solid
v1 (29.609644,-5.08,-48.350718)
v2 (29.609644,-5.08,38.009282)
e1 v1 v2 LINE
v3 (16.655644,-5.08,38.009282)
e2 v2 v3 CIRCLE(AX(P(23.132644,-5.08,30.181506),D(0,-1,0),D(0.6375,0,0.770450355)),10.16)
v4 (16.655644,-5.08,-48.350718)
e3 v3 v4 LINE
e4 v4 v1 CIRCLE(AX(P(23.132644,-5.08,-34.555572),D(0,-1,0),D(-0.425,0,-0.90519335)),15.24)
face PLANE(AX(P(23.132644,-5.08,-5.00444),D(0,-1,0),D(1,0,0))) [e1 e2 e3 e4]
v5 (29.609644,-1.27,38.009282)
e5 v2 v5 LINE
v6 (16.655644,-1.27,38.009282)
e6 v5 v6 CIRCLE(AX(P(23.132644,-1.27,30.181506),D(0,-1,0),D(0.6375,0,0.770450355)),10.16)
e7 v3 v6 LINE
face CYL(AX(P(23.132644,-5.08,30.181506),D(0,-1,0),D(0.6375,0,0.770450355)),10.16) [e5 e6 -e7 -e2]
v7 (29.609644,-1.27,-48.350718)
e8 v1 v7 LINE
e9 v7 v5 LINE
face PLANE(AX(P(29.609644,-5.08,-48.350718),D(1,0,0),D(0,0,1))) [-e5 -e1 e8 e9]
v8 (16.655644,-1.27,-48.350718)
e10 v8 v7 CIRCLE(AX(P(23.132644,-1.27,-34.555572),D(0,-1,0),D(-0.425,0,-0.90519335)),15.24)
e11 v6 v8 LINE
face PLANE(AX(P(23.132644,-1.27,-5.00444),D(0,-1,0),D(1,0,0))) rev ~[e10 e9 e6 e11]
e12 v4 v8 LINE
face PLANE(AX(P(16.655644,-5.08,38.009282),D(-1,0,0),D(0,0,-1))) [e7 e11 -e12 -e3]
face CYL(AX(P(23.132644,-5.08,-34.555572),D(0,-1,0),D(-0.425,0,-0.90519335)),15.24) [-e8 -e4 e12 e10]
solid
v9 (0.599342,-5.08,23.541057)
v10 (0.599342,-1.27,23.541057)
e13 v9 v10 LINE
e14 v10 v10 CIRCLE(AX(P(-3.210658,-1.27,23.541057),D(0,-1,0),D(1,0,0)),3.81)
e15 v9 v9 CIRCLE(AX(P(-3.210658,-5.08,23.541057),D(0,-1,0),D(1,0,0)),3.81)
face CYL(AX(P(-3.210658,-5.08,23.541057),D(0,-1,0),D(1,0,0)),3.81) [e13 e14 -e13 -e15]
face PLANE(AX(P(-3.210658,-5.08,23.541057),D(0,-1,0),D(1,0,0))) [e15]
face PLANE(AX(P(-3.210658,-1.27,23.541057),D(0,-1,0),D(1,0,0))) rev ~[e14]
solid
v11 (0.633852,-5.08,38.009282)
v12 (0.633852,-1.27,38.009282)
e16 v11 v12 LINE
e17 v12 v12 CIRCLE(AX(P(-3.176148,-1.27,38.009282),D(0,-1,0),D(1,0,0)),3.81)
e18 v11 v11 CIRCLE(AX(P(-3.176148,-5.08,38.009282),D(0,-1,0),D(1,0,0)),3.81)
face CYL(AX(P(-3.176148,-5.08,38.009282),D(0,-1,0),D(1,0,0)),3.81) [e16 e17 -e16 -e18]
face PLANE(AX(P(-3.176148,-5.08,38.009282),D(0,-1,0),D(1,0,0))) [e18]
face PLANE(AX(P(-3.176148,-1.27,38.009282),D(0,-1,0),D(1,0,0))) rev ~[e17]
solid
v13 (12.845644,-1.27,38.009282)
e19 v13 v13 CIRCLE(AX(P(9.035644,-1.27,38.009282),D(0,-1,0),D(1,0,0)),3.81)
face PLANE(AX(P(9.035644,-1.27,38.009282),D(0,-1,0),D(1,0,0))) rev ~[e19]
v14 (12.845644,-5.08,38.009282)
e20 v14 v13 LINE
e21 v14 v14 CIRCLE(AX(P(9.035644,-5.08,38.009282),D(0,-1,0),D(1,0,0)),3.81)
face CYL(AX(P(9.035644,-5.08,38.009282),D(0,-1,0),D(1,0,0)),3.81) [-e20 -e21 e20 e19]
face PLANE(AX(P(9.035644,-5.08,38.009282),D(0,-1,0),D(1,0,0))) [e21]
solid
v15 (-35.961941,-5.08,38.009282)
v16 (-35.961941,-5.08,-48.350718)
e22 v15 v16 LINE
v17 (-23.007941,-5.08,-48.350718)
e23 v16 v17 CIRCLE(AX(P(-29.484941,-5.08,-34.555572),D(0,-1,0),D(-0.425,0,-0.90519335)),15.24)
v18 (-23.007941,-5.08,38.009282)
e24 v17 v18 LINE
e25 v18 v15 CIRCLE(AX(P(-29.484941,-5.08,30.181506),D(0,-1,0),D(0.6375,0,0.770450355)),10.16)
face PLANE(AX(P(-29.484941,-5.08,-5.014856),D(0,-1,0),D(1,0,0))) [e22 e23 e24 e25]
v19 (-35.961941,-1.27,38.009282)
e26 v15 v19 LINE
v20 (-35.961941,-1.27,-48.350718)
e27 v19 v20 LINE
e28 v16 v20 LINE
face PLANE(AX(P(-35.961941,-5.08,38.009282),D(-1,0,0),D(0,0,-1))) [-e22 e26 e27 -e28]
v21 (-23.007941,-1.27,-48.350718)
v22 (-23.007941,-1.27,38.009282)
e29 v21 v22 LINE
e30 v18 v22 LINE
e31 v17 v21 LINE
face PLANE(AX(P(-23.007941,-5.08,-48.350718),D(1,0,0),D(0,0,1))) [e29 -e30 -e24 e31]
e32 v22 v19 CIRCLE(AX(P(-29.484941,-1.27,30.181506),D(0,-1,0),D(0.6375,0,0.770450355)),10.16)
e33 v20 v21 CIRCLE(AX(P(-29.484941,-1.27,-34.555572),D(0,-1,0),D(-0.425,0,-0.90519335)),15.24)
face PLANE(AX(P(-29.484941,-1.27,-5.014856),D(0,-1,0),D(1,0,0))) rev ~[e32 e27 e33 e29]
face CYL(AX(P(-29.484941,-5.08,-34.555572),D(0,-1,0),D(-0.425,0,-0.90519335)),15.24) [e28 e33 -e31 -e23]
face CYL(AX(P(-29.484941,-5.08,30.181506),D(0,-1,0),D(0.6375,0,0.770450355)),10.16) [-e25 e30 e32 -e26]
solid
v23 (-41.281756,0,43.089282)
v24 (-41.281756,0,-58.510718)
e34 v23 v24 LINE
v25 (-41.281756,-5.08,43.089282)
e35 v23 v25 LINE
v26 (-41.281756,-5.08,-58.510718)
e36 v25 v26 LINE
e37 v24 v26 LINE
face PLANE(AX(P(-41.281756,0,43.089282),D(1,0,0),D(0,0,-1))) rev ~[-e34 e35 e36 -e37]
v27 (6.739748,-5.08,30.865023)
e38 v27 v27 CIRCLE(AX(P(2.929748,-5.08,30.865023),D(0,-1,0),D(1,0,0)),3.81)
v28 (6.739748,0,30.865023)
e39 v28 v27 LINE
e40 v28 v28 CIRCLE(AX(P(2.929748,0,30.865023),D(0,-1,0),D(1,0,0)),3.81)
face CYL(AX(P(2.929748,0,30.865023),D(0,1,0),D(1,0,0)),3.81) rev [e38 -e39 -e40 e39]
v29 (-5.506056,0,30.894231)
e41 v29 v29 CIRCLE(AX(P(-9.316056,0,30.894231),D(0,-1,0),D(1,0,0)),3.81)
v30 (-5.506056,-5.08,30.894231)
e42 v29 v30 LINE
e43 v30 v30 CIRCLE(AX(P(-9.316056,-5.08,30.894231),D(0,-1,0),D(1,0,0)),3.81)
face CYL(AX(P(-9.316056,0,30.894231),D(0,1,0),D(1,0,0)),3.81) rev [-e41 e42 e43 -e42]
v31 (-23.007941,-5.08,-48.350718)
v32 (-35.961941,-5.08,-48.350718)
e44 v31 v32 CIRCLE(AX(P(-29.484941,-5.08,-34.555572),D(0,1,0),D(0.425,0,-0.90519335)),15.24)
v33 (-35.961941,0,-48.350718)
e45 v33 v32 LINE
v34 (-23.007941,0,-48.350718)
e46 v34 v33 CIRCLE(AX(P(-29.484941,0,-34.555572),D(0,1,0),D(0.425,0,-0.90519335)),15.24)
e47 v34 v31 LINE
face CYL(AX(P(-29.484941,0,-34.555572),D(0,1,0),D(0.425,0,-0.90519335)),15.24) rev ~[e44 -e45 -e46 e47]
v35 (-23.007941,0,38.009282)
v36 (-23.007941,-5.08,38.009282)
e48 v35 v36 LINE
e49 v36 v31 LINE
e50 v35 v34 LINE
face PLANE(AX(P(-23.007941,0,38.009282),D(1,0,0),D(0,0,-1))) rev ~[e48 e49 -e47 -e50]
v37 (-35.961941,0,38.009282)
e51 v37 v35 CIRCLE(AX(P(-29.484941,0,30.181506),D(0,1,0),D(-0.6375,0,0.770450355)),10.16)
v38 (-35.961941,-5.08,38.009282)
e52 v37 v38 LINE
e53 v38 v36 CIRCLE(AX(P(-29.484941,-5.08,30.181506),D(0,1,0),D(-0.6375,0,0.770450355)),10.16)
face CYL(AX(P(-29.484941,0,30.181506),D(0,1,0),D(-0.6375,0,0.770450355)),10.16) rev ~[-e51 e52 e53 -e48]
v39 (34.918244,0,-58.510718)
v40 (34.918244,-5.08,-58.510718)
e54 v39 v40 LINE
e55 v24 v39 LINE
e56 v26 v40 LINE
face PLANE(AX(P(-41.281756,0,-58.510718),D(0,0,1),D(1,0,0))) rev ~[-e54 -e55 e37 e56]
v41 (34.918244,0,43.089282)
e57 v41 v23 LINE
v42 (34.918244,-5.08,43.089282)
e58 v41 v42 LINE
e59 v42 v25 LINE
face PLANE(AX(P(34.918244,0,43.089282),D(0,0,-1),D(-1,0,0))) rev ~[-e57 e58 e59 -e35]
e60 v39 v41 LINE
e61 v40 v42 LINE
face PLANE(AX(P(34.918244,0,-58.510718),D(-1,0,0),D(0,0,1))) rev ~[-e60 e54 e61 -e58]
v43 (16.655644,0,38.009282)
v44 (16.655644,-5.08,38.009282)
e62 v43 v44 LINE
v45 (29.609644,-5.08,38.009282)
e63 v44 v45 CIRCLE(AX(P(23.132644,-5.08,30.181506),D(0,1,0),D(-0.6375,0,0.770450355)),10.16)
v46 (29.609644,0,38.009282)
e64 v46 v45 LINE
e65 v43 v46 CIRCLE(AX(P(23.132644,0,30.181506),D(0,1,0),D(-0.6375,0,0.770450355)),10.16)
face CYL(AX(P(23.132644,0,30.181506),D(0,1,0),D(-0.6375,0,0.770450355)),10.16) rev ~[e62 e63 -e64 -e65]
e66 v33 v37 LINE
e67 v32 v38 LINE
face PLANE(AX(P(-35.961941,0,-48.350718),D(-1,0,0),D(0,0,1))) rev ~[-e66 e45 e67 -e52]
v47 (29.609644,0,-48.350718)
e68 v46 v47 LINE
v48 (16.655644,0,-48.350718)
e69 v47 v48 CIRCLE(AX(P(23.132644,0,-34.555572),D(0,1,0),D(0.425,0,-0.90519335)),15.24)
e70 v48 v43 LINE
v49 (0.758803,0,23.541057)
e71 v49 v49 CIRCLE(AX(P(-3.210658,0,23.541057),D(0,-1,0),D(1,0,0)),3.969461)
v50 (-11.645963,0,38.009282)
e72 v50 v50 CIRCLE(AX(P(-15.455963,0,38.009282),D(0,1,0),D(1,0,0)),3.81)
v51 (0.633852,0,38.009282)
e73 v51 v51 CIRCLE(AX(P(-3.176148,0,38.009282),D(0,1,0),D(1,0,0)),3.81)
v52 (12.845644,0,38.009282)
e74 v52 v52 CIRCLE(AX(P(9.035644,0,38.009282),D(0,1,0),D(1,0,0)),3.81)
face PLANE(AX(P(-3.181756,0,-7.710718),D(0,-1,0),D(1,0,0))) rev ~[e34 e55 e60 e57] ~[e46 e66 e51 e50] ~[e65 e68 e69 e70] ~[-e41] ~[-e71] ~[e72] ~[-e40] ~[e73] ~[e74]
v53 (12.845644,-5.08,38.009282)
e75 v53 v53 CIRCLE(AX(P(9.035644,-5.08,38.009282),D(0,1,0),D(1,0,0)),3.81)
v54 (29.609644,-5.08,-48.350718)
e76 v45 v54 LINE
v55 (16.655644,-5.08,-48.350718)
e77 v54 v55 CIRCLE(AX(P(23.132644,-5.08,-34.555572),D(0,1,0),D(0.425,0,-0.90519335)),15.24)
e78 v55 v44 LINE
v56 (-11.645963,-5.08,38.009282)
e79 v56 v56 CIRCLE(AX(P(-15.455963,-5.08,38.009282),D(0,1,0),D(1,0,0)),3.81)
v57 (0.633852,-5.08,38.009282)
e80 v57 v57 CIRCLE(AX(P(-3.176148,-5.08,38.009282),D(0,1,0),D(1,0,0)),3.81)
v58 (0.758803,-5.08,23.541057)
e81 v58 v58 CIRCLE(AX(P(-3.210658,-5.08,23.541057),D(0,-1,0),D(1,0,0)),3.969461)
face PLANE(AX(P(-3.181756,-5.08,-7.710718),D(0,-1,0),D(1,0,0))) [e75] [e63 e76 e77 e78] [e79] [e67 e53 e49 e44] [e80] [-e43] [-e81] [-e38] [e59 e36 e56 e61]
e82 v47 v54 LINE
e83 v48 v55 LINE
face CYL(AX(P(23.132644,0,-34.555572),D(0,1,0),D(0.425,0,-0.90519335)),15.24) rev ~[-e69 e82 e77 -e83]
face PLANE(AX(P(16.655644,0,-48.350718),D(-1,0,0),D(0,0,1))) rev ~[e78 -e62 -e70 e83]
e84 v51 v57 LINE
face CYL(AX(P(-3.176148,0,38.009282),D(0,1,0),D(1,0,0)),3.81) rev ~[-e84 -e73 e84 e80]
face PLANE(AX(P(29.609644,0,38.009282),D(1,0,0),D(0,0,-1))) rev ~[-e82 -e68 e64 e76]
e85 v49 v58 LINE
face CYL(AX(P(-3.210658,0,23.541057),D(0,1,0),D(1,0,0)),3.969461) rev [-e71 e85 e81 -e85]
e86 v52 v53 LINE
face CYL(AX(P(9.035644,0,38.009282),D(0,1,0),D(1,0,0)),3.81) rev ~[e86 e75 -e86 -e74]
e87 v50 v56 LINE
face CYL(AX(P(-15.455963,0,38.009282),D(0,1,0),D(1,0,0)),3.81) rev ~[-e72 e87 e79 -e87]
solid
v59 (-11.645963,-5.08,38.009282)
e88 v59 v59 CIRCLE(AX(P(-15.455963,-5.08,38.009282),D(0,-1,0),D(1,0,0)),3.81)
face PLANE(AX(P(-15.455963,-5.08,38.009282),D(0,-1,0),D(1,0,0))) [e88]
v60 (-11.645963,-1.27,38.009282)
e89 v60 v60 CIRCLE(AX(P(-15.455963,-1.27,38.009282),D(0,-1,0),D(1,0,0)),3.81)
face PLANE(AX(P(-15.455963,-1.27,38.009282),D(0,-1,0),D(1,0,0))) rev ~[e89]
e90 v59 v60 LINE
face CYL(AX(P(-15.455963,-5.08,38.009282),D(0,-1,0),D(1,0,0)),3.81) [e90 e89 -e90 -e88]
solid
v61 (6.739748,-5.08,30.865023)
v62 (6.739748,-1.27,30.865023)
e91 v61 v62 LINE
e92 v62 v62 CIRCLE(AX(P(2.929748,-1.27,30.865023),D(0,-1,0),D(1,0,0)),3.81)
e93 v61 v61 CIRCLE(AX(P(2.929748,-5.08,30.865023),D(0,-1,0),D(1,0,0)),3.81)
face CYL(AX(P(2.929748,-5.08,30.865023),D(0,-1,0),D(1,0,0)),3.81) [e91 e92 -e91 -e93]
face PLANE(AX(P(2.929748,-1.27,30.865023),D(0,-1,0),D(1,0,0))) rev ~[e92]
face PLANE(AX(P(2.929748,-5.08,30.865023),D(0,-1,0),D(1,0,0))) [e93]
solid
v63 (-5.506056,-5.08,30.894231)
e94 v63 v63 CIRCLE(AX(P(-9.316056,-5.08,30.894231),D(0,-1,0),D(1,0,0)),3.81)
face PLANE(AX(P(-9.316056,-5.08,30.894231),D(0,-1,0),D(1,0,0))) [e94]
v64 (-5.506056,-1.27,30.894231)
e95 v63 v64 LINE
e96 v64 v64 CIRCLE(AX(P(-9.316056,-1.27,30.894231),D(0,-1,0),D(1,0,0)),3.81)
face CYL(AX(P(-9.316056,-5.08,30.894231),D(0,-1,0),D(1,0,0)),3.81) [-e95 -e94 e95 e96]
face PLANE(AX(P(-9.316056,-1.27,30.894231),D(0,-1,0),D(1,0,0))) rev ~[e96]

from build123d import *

# Parameters (mm, degrees)
F0_R     = 3.969461057
F0_R_2   = 3.81
F2_DEPTH = 5.08
F3_R     = 3.81
F4_DEPTH = 3.81


# Not quite as in the source:
# - the program builds the solid bodies; features that only make, move or delete a surface that nothing else refers to are left out


with BuildPart() as f2:
    # F0 (on Front) → F2 (new body)
    with BuildSketch(Plane.XZ):
        Polygon((34.9182439864, 43.0892817676), (-41.2817560136, 43.0892817676), (-41.2817560136, -58.5107182324), (34.9182439864, -58.5107182324), (34.9182439864, 38.0092817676), align=None)
        with BuildLine():
            ThreePointArc((-35.9619408846, 38.0092817676), (-29.4849408846, 40.3415061576), (-23.0079408846, 38.0092817676))
            Line((-23.0079408846, 38.0092817676), (-23.0079408846, -48.3507182324))
            ThreePointArc((-23.0079408846, -48.3507182324), (-29.4849408846, -49.7955715858), (-35.9619408846, -48.3507182324))
            Line((-35.9619408846, -48.3507182324), (-35.9619408846, 38.0092817676))
        make_face(mode=Mode.SUBTRACT)
        with Locations((-3.2106578548, 23.5410566752)):
            Circle(F0_R, mode=Mode.SUBTRACT)
        with BuildLine():
            ThreePointArc((-19.2659630901, 38.0092817676), (-15.4559630901, 41.8192817676), (-11.6459630901, 38.0092817676))
            ThreePointArc((-11.6459630901, 38.0092817676), (-15.4559630901, 34.1992817676), (-19.2659630901, 38.0092817676))
        make_face(mode=Mode.SUBTRACT)
        with Locations((-9.3160557696, 30.8942313745)):
            Circle(F0_R_2, mode=Mode.SUBTRACT)
        with BuildLine():
            ThreePointArc((16.6556439864, 38.0092817676), (23.1326439864, 40.3415061576), (29.6096439864, 38.0092817676))
            Line((29.6096439864, 38.0092817676), (29.6096439864, -48.3507182324))
            ThreePointArc((29.6096439864, -48.3507182324), (23.1326439864, -49.7955715858), (16.6556439864, -48.3507182324))
            Line((16.6556439864, -48.3507182324), (16.6556439864, 38.0092817676))
        make_face(mode=Mode.SUBTRACT)
        with Locations((2.9297477686, 30.8650228573)):
            Circle(F0_R_2, mode=Mode.SUBTRACT)
        with BuildLine():
            ThreePointArc((-6.9861484491, 38.0092817676), (-3.1761484491, 41.8192817676), (0.6338515509, 38.0092817676))
            ThreePointArc((0.6338515509, 38.0092817676), (-3.1761484491, 34.1992817676), (-6.9861484491, 38.0092817676))
        make_face(mode=Mode.SUBTRACT)
        with BuildLine():
            ThreePointArc((5.2256439864, 38.0092817676), (9.0356439864, 41.8192817676), (12.8456439864, 38.0092817676))
            ThreePointArc((12.8456439864, 38.0092817676), (9.0356439864, 34.1992817676), (5.2256439864, 38.0092817676))
        make_face(mode=Mode.SUBTRACT)
    extrude(amount=F2_DEPTH)


with BuildPart() as f4:
    # F3 (on face) → F4 (new body)
    with BuildSketch(Plane.XZ.offset(5.08)):
        with Locations((-15.4559630901, 38.0092817676)):
            Circle(F3_R)
    extrude(amount=-F4_DEPTH)


with BuildPart() as f4b:
    # F3 (on face) → F4, piece 2 (new body)
    with BuildSketch(Plane.XZ.offset(5.08)):
        with Locations((-3.1761484491, 38.0092817676)):
            Circle(F3_R)
    extrude(amount=-F4_DEPTH)


with BuildPart() as f4c:
    # F3 (on face) → F4, piece 3 (new body)
    with BuildSketch(Plane.XZ.offset(5.08)):
        with Locations((9.0356439864, 38.0092817676)):
            Circle(F3_R)
    extrude(amount=-F4_DEPTH)


with BuildPart() as f4d:
    # F3 (on face) → F4, piece 4 (new body)
    with BuildSketch(Plane.XZ.offset(5.08)):
        with Locations((2.9297477686, 30.8650228573)):
            Circle(F3_R)
    extrude(amount=-F4_DEPTH)


with BuildPart() as f4e:
    # F3 (on face) → F4, piece 5 (new body)
    with BuildSketch(Plane.XZ.offset(5.08)):
        with Locations((-9.3160557696, 30.8942313745)):
            Circle(F3_R)
    extrude(amount=-F4_DEPTH)


with BuildPart() as f4f:
    # F3 (on face) → F4, piece 6 (new body)
    with BuildSketch(Plane.XZ.offset(5.08)):
        with Locations((-3.2106578548, 23.5410566752)):
            Circle(F3_R)
    extrude(amount=-F4_DEPTH)


with BuildPart() as f4g:
    # F3 (on face) → F4, piece 7 (new body)
    with BuildSketch(Plane.XZ.offset(5.08)):
        with BuildLine():
            Line((-23.0079408846, -48.3507182324), (-23.0079408846, 38.0092817676))
            ThreePointArc((-23.0079408846, 38.0092817676), (-29.4849408846, 40.2938211878), (-35.9619408846, 38.0092817676))
            Line((-35.9619408846, 38.0092817676), (-35.9619408846, -48.3507182324))
            ThreePointArc((-35.9619408846, -48.3507182324), (-29.4849408846, -49.7955715858), (-23.0079408846, -48.3507182324))
        make_face()
        with BuildLine():
            ThreePointArc((-35.9619408846, 38.0092817676), (-29.4849408846, 40.2938211878), (-23.0079408846, 38.0092817676))
            ThreePointArc((-23.0079408846, 38.0092817676), (-29.4849408846, 40.3415061576), (-35.9619408846, 38.0092817676))
        make_face()
    extrude(amount=-F4_DEPTH)


with BuildPart() as f4h:
    # F3 (on face) → F4, piece 8 (new body)
    with BuildSketch(Plane.XZ.offset(5.08)):
        with BuildLine():
            Line((29.6096439864, -48.3507182324), (29.6096439864, 38.0092817676))
            ThreePointArc((29.6096439864, 38.0092817676), (23.1326439864, 40.3415061576), (16.6556439864, 38.0092817676))
            Line((16.6556439864, 38.0092817676), (16.6556439864, -48.3507182324))
            ThreePointArc((16.6556439864, -48.3507182324), (23.1326439864, -49.7955715858), (29.6096439864, -48.3507182324))
        make_face()
    extrude(amount=-F4_DEPTH)


solid = Compound([f2.part, f4.part, f4b.part, f4c.part, f4d.part, f4e.part, f4f.part, f4g.part, f4h.part])
